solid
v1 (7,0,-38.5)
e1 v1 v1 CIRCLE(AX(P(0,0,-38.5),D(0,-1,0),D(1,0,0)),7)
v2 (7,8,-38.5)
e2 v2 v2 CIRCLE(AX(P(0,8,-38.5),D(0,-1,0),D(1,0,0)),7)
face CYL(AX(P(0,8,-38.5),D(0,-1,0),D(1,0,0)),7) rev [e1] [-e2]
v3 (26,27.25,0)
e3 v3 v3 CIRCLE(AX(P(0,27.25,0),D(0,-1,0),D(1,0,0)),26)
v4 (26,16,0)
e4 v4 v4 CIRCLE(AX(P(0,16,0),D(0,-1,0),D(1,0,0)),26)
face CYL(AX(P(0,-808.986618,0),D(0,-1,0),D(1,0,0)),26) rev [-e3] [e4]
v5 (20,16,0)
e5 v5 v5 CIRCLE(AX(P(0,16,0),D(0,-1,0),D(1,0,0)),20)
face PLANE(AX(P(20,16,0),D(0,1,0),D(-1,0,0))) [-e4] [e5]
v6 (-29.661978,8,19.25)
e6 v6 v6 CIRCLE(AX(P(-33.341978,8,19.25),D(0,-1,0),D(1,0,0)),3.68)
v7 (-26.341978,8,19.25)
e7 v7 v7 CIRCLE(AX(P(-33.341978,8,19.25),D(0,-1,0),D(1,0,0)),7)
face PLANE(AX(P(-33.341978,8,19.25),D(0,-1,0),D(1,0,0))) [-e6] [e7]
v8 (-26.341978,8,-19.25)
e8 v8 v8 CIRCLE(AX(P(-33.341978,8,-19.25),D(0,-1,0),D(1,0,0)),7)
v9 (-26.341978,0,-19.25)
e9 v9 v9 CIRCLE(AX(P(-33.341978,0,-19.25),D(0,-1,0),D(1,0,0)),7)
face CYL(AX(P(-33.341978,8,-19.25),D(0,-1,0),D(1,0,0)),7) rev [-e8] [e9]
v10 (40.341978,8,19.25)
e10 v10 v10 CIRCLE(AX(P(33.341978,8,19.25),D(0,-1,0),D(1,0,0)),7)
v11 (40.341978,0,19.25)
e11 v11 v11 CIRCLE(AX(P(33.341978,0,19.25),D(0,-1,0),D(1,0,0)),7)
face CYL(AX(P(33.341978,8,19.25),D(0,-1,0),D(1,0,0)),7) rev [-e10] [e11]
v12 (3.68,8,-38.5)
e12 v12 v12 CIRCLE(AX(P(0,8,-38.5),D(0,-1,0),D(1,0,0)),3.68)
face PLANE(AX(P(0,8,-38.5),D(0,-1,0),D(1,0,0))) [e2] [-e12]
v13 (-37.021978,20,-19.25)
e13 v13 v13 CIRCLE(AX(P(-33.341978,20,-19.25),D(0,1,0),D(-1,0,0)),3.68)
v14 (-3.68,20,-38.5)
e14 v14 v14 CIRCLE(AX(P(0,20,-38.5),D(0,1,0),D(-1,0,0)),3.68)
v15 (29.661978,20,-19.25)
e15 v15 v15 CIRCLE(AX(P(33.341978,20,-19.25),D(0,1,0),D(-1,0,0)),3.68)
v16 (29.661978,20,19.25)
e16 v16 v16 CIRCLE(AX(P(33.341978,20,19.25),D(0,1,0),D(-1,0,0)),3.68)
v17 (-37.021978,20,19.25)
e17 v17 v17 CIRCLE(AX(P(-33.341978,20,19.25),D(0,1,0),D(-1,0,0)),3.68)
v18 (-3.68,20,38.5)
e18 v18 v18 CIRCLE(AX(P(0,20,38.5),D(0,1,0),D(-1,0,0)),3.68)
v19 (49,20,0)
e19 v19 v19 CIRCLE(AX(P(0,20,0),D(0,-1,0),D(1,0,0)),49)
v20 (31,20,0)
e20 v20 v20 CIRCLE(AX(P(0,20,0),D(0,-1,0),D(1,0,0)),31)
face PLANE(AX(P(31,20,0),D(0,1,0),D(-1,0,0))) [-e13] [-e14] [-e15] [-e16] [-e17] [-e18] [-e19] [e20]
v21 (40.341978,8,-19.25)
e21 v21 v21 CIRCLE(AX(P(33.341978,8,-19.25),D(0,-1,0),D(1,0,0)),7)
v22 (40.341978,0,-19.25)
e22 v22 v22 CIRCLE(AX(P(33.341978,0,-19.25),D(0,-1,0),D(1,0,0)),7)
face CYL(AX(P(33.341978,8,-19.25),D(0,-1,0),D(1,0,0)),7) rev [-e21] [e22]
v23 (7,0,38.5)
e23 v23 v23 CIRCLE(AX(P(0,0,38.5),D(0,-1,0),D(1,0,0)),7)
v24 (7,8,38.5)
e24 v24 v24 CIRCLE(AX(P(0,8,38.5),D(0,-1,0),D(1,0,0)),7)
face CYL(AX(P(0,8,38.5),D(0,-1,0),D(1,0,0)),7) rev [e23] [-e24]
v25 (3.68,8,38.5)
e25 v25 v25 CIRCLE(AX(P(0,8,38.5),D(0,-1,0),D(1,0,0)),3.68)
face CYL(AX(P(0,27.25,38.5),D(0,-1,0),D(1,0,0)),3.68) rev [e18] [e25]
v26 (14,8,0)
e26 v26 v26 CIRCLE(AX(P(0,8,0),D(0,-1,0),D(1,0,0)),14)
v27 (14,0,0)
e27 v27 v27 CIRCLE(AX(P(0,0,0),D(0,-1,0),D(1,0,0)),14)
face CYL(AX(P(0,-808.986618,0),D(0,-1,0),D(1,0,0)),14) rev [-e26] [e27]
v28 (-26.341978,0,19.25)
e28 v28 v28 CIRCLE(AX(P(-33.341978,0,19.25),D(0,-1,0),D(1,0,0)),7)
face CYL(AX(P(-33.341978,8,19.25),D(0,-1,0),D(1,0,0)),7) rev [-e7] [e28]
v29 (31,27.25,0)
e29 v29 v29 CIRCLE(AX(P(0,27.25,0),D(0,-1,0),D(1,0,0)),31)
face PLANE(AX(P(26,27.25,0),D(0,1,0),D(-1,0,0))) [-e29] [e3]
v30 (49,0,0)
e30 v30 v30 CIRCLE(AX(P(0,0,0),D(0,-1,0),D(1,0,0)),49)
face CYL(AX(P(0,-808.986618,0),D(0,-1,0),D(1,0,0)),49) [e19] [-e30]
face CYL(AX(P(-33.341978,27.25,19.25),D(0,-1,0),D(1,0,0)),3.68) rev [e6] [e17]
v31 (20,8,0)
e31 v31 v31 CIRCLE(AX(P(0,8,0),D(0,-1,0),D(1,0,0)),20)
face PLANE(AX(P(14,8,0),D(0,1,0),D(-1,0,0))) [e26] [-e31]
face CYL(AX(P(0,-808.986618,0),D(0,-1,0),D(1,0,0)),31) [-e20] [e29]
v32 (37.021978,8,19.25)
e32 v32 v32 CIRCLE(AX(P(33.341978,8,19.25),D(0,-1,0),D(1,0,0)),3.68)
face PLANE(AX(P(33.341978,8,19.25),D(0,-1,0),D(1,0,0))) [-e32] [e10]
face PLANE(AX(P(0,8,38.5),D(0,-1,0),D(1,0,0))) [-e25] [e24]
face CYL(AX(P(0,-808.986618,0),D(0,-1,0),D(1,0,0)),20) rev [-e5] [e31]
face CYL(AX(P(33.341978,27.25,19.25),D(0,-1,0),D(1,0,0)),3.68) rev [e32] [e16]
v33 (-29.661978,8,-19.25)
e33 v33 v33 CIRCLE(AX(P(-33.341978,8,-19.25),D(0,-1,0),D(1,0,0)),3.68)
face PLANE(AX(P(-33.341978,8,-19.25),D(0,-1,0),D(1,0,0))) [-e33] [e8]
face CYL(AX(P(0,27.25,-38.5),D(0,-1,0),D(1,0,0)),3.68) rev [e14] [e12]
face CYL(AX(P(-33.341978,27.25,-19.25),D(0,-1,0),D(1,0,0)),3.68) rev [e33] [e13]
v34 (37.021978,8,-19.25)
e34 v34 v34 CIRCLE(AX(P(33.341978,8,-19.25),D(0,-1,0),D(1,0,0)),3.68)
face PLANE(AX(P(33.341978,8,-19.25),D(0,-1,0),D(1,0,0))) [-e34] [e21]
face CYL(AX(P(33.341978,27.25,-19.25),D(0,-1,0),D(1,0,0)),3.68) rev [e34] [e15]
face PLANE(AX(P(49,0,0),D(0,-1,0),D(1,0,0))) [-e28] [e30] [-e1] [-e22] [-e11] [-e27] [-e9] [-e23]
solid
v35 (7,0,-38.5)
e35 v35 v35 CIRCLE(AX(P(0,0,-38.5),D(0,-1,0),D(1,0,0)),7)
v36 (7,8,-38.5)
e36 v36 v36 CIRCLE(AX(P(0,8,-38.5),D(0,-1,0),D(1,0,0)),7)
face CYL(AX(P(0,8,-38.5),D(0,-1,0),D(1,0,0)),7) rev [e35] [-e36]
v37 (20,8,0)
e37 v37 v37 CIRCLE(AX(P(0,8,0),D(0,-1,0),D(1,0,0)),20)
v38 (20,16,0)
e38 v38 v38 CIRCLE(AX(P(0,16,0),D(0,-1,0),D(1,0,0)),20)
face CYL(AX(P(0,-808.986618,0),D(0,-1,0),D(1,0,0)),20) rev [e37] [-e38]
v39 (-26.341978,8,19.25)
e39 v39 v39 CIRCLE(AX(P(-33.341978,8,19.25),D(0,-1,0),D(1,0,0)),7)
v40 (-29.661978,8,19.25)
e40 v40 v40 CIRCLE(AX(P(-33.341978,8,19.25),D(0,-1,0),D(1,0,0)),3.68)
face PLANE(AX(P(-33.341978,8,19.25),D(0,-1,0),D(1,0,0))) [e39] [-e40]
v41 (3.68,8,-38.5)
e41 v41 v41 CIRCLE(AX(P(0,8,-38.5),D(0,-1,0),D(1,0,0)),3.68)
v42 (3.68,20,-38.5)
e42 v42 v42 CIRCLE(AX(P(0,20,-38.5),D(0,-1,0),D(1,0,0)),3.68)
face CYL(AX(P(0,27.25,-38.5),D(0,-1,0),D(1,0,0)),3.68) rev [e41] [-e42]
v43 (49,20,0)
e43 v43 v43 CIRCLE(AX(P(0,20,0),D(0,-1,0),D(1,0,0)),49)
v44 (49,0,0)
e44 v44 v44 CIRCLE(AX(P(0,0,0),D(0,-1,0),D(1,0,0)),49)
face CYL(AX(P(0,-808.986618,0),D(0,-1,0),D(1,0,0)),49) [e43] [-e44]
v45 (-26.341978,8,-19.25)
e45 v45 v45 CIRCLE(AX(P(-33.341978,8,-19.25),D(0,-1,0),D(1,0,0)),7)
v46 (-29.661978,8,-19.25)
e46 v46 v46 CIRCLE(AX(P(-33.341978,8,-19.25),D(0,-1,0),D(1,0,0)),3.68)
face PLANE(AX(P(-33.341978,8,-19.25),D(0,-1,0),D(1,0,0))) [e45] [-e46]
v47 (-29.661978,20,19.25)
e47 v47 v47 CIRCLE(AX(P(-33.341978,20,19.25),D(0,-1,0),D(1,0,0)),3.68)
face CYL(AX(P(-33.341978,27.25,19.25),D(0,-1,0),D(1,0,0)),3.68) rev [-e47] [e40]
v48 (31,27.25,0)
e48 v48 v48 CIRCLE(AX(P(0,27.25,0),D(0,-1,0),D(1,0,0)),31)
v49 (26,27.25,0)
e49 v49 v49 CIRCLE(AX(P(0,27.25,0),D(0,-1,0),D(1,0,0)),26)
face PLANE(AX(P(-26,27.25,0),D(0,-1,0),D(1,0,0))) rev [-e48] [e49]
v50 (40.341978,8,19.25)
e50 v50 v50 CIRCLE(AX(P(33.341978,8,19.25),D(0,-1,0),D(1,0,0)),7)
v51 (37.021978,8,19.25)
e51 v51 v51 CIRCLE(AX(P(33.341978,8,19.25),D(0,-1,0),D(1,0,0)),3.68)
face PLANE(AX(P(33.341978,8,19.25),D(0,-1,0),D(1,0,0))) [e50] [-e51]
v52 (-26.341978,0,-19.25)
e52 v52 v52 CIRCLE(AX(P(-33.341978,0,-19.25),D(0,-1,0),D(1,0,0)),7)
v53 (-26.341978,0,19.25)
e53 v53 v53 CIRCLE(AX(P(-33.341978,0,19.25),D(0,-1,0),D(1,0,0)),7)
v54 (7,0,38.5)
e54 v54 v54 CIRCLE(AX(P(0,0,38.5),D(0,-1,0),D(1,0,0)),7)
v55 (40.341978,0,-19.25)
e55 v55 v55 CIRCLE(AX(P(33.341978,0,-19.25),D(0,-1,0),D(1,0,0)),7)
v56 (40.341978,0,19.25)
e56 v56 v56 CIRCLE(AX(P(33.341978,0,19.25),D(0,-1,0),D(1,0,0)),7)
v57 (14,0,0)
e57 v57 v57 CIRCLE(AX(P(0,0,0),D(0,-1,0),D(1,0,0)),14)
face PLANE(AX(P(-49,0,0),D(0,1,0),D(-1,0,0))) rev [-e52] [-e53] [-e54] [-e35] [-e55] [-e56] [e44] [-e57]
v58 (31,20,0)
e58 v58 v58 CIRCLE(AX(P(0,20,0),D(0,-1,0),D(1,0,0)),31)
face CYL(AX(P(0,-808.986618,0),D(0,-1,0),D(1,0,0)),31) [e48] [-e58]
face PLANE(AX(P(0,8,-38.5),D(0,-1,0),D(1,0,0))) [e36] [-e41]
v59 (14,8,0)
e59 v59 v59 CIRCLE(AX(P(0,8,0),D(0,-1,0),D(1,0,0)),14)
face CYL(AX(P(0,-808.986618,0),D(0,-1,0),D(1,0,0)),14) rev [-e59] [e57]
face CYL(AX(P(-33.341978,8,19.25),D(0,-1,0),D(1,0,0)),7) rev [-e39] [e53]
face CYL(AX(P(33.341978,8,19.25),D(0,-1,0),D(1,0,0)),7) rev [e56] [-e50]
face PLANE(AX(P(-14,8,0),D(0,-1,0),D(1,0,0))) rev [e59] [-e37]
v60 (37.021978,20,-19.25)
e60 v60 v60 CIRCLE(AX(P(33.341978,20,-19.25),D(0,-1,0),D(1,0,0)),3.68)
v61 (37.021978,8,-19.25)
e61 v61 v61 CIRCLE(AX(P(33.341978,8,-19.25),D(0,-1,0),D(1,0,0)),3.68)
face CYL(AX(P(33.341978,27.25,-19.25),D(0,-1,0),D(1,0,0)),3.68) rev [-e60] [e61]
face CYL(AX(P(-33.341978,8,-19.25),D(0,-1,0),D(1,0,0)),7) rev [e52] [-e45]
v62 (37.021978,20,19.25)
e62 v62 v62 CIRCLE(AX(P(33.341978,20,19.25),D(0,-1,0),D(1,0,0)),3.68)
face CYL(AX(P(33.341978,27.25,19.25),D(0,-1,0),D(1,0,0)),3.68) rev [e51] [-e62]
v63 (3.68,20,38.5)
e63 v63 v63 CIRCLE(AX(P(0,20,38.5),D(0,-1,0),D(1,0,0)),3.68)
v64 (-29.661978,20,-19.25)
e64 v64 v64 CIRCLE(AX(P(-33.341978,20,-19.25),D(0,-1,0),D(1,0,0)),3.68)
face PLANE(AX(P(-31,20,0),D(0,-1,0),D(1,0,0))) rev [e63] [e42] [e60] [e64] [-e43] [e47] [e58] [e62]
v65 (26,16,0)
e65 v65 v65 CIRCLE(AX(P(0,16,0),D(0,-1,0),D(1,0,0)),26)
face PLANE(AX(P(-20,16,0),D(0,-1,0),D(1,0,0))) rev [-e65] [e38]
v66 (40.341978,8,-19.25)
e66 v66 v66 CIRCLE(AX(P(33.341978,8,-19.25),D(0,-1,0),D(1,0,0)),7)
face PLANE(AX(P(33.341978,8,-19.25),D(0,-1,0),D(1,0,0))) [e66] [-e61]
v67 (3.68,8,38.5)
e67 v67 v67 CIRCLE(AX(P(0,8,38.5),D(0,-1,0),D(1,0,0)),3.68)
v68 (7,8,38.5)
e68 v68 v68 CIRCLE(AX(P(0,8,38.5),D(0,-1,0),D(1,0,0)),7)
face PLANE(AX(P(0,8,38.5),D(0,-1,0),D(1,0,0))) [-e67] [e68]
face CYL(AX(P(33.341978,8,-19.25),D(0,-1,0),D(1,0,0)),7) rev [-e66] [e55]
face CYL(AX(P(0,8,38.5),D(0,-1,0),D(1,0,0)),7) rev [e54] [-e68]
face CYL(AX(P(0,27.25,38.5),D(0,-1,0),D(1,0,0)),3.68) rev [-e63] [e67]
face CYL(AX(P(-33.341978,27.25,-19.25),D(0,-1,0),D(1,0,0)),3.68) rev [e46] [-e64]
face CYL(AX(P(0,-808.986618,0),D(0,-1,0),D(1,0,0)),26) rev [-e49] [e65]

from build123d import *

# Parameters (mm, degrees)
REVOLVE_1_OUTLINE_R     = 49
REVOLVE_1_OUTLINE_R_2   = 26
REVOLVE_1_DEPTH         = 20
REVOLVE_1_2_OUTLINE_R   = 26
REVOLVE_1_2_OUTLINE_R_2 = 20
REVOLVE_1_2_DEPTH       = 16
REVOLVE_START           = 20
REVOLVE_1_3_OUTLINE_R   = 31
REVOLVE_1_3_OUTLINE_R_2 = 26
REVOLVE_1_3_DEPTH       = 7.25
REVOLVE_1_4_OUTLINE_R   = 20
REVOLVE_1_4_OUTLINE_R_2 = 14
REVOLVE_1_4_DEPTH       = 8
REVOLVE_1_5_OUTLINE_R   = 49
REVOLVE_1_5_OUTLINE_R_2 = 26
REVOLVE_1_5_DEPTH       = 20
REVOLVE_1_6_OUTLINE_R   = 26
REVOLVE_1_6_OUTLINE_R_2 = 20
REVOLVE_1_6_DEPTH       = 16
REVOLVE_1_7_OUTLINE_R   = 31
REVOLVE_1_7_OUTLINE_R_2 = 26
REVOLVE_1_7_DEPTH       = 7.25
REVOLVE_1_8_OUTLINE_R   = 20
REVOLVE_1_8_OUTLINE_R_2 = 14
REVOLVE_1_8_DEPTH       = 8
SKETCH_2_R              = 3.68
CUT_EXTRUDE_1_DEPTH     = 75.461819075
SKETCH_2_3_R            = 7
SKETCH_2_3_R_2          = 3.68
CUT_EXTRUDE_2_DEPTH     = 8


# Read off the part's stored shape, not the designer's step: 旋转1
with BuildPart() as part:
    # 旋转1 outline → 旋转1 (new body)
    with BuildSketch(Plane(origin=(0, 0, 0), x_dir=(1, 0, 0), z_dir=(0, 1, 0))):
        Circle(REVOLVE_1_OUTLINE_R)
        Circle(REVOLVE_1_OUTLINE_R_2, mode=Mode.SUBTRACT)
    extrude(amount=REVOLVE_1_DEPTH)

    # Revolve 1 2 outline → Revolve 1 2 (add)
    with BuildSketch(Plane(origin=(0, 0, 0), x_dir=(1, 0, 0), z_dir=(0, 1, 0))):
        Circle(REVOLVE_1_2_OUTLINE_R)
        Circle(REVOLVE_1_2_OUTLINE_R_2, mode=Mode.SUBTRACT)
    extrude(amount=REVOLVE_1_2_DEPTH)

    # Revolve 1 3 outline → Revolve 1 3 (add)
    with BuildSketch(Plane(origin=(0, 0, 0), x_dir=(1, 0, 0), z_dir=(0, 1, 0)).offset(REVOLVE_START)):
        Circle(REVOLVE_1_3_OUTLINE_R)
        Circle(REVOLVE_1_3_OUTLINE_R_2, mode=Mode.SUBTRACT)
    extrude(amount=REVOLVE_1_3_DEPTH)

    # Revolve 1 4 outline → Revolve 1 4 (add)
    with BuildSketch(Plane(origin=(0, 0, 0), x_dir=(1, 0, 0), z_dir=(0, 1, 0))):
        Circle(REVOLVE_1_4_OUTLINE_R)
        Circle(REVOLVE_1_4_OUTLINE_R_2, mode=Mode.SUBTRACT)
    extrude(amount=REVOLVE_1_4_DEPTH)


with BuildPart() as body_2:
    # Revolve 1 5 outline → Revolve 1 5 (new body)
    with BuildSketch(Plane(origin=(0, 0, 0), x_dir=(1, 0, 0), z_dir=(0, 1, 0))):
        Circle(REVOLVE_1_5_OUTLINE_R)
        Circle(REVOLVE_1_5_OUTLINE_R_2, mode=Mode.SUBTRACT)
    extrude(amount=REVOLVE_1_5_DEPTH)

    # Revolve 1 6 outline → Revolve 1 6 (add)
    with BuildSketch(Plane(origin=(0, 0, 0), x_dir=(1, 0, 0), z_dir=(0, 1, 0))):
        Circle(REVOLVE_1_6_OUTLINE_R)
        Circle(REVOLVE_1_6_OUTLINE_R_2, mode=Mode.SUBTRACT)
    extrude(amount=REVOLVE_1_6_DEPTH)

    # Revolve 1 7 outline → Revolve 1 7 (add)
    with BuildSketch(Plane(origin=(0, 0, 0), x_dir=(1, 0, 0), z_dir=(0, 1, 0)).offset(REVOLVE_START)):
        Circle(REVOLVE_1_7_OUTLINE_R)
        Circle(REVOLVE_1_7_OUTLINE_R_2, mode=Mode.SUBTRACT)
    extrude(amount=REVOLVE_1_7_DEPTH)

    # Revolve 1 8 outline → Revolve 1 8 (add)
    with BuildSketch(Plane(origin=(0, 0, 0), x_dir=(1, 0, 0), z_dir=(0, 1, 0))):
        Circle(REVOLVE_1_8_OUTLINE_R)
        Circle(REVOLVE_1_8_OUTLINE_R_2, mode=Mode.SUBTRACT)
    extrude(amount=REVOLVE_1_8_DEPTH)


with BuildPart() as cut_extrude_1_tool:
    # 草图2 → 切除-拉伸1 (new, through all)
    with BuildSketch(Plane.XZ):
        with Locations((0, 38.5)):
            Circle(SKETCH_2_R)
        with Locations((33.341978046, 19.25)):
            Circle(SKETCH_2_R)
        with Locations((33.341978046, -19.25)):
            Circle(SKETCH_2_R)
        with Locations((0, -38.5)):
            Circle(SKETCH_2_R)
        with Locations((-33.341978046, -19.25)):
            Circle(SKETCH_2_R)
        with Locations((-33.341978046, 19.25)):
            Circle(SKETCH_2_R)
    extrude(amount=-CUT_EXTRUDE_1_DEPTH)


with BuildPart() as part_1:
    add(part.part)

    # 切除-拉伸1: cut by cut_extrude_1_tool
    add(cut_extrude_1_tool.part, mode=Mode.SUBTRACT)


with BuildPart() as body_2_1:
    add(body_2.part)

    # 切除-拉伸1: cut by cut_extrude_1_tool
    add(cut_extrude_1_tool.part, mode=Mode.SUBTRACT)


with BuildPart() as cut_extrude_2_tool:
    # 草图2<3> → 切除-拉伸2 (new body)
    # profile 1 of 6: a face of its own
    with BuildSketch(Plane.XZ):
        with Locations((0, 38.5)):
            Circle(SKETCH_2_3_R)
        with Locations((0, 38.5)):
            Circle(SKETCH_2_3_R_2, mode=Mode.SUBTRACT)
    # profile 2 of 6: a face of its own
    with BuildSketch(Plane.XZ):
        with Locations((33.341978046, 19.25)):
            Circle(SKETCH_2_3_R)
        with Locations((33.341978046, 19.25)):
            Circle(SKETCH_2_3_R_2, mode=Mode.SUBTRACT)
    # profile 3 of 6: a face of its own
    with BuildSketch(Plane.XZ):
        with Locations((33.341978046, -19.25)):
            Circle(SKETCH_2_3_R)
        with Locations((33.341978046, -19.25)):
            Circle(SKETCH_2_3_R_2, mode=Mode.SUBTRACT)
    # profile 4 of 6: a face of its own
    with BuildSketch(Plane.XZ):
        with Locations((0, -38.5)):
            Circle(SKETCH_2_3_R)
        with Locations((0, -38.5)):
            Circle(SKETCH_2_3_R_2, mode=Mode.SUBTRACT)
    # profile 5 of 6: a face of its own
    with BuildSketch(Plane.XZ):
        with Locations((-33.341978046, -19.25)):
            Circle(SKETCH_2_3_R)
        with Locations((-33.341978046, -19.25)):
            Circle(SKETCH_2_3_R_2, mode=Mode.SUBTRACT)
    # profile 6 of 6: a face of its own
    with BuildSketch(Plane.XZ):
        with Locations((-33.341978046, 19.25)):
            Circle(SKETCH_2_3_R)
        with Locations((-33.341978046, 19.25)):
            Circle(SKETCH_2_3_R_2, mode=Mode.SUBTRACT)
    extrude(amount=-CUT_EXTRUDE_2_DEPTH)


with BuildPart() as part_2:
    add(part_1.part)

    # 切除-拉伸2: cut by cut_extrude_2_tool
    add(cut_extrude_2_tool.part, mode=Mode.SUBTRACT)


with BuildPart() as body_2_2:
    add(body_2_1.part)

    # 切除-拉伸2: cut by cut_extrude_2_tool
    add(cut_extrude_2_tool.part, mode=Mode.SUBTRACT)


solid = Compound([part_2.part, body_2_2.part])
